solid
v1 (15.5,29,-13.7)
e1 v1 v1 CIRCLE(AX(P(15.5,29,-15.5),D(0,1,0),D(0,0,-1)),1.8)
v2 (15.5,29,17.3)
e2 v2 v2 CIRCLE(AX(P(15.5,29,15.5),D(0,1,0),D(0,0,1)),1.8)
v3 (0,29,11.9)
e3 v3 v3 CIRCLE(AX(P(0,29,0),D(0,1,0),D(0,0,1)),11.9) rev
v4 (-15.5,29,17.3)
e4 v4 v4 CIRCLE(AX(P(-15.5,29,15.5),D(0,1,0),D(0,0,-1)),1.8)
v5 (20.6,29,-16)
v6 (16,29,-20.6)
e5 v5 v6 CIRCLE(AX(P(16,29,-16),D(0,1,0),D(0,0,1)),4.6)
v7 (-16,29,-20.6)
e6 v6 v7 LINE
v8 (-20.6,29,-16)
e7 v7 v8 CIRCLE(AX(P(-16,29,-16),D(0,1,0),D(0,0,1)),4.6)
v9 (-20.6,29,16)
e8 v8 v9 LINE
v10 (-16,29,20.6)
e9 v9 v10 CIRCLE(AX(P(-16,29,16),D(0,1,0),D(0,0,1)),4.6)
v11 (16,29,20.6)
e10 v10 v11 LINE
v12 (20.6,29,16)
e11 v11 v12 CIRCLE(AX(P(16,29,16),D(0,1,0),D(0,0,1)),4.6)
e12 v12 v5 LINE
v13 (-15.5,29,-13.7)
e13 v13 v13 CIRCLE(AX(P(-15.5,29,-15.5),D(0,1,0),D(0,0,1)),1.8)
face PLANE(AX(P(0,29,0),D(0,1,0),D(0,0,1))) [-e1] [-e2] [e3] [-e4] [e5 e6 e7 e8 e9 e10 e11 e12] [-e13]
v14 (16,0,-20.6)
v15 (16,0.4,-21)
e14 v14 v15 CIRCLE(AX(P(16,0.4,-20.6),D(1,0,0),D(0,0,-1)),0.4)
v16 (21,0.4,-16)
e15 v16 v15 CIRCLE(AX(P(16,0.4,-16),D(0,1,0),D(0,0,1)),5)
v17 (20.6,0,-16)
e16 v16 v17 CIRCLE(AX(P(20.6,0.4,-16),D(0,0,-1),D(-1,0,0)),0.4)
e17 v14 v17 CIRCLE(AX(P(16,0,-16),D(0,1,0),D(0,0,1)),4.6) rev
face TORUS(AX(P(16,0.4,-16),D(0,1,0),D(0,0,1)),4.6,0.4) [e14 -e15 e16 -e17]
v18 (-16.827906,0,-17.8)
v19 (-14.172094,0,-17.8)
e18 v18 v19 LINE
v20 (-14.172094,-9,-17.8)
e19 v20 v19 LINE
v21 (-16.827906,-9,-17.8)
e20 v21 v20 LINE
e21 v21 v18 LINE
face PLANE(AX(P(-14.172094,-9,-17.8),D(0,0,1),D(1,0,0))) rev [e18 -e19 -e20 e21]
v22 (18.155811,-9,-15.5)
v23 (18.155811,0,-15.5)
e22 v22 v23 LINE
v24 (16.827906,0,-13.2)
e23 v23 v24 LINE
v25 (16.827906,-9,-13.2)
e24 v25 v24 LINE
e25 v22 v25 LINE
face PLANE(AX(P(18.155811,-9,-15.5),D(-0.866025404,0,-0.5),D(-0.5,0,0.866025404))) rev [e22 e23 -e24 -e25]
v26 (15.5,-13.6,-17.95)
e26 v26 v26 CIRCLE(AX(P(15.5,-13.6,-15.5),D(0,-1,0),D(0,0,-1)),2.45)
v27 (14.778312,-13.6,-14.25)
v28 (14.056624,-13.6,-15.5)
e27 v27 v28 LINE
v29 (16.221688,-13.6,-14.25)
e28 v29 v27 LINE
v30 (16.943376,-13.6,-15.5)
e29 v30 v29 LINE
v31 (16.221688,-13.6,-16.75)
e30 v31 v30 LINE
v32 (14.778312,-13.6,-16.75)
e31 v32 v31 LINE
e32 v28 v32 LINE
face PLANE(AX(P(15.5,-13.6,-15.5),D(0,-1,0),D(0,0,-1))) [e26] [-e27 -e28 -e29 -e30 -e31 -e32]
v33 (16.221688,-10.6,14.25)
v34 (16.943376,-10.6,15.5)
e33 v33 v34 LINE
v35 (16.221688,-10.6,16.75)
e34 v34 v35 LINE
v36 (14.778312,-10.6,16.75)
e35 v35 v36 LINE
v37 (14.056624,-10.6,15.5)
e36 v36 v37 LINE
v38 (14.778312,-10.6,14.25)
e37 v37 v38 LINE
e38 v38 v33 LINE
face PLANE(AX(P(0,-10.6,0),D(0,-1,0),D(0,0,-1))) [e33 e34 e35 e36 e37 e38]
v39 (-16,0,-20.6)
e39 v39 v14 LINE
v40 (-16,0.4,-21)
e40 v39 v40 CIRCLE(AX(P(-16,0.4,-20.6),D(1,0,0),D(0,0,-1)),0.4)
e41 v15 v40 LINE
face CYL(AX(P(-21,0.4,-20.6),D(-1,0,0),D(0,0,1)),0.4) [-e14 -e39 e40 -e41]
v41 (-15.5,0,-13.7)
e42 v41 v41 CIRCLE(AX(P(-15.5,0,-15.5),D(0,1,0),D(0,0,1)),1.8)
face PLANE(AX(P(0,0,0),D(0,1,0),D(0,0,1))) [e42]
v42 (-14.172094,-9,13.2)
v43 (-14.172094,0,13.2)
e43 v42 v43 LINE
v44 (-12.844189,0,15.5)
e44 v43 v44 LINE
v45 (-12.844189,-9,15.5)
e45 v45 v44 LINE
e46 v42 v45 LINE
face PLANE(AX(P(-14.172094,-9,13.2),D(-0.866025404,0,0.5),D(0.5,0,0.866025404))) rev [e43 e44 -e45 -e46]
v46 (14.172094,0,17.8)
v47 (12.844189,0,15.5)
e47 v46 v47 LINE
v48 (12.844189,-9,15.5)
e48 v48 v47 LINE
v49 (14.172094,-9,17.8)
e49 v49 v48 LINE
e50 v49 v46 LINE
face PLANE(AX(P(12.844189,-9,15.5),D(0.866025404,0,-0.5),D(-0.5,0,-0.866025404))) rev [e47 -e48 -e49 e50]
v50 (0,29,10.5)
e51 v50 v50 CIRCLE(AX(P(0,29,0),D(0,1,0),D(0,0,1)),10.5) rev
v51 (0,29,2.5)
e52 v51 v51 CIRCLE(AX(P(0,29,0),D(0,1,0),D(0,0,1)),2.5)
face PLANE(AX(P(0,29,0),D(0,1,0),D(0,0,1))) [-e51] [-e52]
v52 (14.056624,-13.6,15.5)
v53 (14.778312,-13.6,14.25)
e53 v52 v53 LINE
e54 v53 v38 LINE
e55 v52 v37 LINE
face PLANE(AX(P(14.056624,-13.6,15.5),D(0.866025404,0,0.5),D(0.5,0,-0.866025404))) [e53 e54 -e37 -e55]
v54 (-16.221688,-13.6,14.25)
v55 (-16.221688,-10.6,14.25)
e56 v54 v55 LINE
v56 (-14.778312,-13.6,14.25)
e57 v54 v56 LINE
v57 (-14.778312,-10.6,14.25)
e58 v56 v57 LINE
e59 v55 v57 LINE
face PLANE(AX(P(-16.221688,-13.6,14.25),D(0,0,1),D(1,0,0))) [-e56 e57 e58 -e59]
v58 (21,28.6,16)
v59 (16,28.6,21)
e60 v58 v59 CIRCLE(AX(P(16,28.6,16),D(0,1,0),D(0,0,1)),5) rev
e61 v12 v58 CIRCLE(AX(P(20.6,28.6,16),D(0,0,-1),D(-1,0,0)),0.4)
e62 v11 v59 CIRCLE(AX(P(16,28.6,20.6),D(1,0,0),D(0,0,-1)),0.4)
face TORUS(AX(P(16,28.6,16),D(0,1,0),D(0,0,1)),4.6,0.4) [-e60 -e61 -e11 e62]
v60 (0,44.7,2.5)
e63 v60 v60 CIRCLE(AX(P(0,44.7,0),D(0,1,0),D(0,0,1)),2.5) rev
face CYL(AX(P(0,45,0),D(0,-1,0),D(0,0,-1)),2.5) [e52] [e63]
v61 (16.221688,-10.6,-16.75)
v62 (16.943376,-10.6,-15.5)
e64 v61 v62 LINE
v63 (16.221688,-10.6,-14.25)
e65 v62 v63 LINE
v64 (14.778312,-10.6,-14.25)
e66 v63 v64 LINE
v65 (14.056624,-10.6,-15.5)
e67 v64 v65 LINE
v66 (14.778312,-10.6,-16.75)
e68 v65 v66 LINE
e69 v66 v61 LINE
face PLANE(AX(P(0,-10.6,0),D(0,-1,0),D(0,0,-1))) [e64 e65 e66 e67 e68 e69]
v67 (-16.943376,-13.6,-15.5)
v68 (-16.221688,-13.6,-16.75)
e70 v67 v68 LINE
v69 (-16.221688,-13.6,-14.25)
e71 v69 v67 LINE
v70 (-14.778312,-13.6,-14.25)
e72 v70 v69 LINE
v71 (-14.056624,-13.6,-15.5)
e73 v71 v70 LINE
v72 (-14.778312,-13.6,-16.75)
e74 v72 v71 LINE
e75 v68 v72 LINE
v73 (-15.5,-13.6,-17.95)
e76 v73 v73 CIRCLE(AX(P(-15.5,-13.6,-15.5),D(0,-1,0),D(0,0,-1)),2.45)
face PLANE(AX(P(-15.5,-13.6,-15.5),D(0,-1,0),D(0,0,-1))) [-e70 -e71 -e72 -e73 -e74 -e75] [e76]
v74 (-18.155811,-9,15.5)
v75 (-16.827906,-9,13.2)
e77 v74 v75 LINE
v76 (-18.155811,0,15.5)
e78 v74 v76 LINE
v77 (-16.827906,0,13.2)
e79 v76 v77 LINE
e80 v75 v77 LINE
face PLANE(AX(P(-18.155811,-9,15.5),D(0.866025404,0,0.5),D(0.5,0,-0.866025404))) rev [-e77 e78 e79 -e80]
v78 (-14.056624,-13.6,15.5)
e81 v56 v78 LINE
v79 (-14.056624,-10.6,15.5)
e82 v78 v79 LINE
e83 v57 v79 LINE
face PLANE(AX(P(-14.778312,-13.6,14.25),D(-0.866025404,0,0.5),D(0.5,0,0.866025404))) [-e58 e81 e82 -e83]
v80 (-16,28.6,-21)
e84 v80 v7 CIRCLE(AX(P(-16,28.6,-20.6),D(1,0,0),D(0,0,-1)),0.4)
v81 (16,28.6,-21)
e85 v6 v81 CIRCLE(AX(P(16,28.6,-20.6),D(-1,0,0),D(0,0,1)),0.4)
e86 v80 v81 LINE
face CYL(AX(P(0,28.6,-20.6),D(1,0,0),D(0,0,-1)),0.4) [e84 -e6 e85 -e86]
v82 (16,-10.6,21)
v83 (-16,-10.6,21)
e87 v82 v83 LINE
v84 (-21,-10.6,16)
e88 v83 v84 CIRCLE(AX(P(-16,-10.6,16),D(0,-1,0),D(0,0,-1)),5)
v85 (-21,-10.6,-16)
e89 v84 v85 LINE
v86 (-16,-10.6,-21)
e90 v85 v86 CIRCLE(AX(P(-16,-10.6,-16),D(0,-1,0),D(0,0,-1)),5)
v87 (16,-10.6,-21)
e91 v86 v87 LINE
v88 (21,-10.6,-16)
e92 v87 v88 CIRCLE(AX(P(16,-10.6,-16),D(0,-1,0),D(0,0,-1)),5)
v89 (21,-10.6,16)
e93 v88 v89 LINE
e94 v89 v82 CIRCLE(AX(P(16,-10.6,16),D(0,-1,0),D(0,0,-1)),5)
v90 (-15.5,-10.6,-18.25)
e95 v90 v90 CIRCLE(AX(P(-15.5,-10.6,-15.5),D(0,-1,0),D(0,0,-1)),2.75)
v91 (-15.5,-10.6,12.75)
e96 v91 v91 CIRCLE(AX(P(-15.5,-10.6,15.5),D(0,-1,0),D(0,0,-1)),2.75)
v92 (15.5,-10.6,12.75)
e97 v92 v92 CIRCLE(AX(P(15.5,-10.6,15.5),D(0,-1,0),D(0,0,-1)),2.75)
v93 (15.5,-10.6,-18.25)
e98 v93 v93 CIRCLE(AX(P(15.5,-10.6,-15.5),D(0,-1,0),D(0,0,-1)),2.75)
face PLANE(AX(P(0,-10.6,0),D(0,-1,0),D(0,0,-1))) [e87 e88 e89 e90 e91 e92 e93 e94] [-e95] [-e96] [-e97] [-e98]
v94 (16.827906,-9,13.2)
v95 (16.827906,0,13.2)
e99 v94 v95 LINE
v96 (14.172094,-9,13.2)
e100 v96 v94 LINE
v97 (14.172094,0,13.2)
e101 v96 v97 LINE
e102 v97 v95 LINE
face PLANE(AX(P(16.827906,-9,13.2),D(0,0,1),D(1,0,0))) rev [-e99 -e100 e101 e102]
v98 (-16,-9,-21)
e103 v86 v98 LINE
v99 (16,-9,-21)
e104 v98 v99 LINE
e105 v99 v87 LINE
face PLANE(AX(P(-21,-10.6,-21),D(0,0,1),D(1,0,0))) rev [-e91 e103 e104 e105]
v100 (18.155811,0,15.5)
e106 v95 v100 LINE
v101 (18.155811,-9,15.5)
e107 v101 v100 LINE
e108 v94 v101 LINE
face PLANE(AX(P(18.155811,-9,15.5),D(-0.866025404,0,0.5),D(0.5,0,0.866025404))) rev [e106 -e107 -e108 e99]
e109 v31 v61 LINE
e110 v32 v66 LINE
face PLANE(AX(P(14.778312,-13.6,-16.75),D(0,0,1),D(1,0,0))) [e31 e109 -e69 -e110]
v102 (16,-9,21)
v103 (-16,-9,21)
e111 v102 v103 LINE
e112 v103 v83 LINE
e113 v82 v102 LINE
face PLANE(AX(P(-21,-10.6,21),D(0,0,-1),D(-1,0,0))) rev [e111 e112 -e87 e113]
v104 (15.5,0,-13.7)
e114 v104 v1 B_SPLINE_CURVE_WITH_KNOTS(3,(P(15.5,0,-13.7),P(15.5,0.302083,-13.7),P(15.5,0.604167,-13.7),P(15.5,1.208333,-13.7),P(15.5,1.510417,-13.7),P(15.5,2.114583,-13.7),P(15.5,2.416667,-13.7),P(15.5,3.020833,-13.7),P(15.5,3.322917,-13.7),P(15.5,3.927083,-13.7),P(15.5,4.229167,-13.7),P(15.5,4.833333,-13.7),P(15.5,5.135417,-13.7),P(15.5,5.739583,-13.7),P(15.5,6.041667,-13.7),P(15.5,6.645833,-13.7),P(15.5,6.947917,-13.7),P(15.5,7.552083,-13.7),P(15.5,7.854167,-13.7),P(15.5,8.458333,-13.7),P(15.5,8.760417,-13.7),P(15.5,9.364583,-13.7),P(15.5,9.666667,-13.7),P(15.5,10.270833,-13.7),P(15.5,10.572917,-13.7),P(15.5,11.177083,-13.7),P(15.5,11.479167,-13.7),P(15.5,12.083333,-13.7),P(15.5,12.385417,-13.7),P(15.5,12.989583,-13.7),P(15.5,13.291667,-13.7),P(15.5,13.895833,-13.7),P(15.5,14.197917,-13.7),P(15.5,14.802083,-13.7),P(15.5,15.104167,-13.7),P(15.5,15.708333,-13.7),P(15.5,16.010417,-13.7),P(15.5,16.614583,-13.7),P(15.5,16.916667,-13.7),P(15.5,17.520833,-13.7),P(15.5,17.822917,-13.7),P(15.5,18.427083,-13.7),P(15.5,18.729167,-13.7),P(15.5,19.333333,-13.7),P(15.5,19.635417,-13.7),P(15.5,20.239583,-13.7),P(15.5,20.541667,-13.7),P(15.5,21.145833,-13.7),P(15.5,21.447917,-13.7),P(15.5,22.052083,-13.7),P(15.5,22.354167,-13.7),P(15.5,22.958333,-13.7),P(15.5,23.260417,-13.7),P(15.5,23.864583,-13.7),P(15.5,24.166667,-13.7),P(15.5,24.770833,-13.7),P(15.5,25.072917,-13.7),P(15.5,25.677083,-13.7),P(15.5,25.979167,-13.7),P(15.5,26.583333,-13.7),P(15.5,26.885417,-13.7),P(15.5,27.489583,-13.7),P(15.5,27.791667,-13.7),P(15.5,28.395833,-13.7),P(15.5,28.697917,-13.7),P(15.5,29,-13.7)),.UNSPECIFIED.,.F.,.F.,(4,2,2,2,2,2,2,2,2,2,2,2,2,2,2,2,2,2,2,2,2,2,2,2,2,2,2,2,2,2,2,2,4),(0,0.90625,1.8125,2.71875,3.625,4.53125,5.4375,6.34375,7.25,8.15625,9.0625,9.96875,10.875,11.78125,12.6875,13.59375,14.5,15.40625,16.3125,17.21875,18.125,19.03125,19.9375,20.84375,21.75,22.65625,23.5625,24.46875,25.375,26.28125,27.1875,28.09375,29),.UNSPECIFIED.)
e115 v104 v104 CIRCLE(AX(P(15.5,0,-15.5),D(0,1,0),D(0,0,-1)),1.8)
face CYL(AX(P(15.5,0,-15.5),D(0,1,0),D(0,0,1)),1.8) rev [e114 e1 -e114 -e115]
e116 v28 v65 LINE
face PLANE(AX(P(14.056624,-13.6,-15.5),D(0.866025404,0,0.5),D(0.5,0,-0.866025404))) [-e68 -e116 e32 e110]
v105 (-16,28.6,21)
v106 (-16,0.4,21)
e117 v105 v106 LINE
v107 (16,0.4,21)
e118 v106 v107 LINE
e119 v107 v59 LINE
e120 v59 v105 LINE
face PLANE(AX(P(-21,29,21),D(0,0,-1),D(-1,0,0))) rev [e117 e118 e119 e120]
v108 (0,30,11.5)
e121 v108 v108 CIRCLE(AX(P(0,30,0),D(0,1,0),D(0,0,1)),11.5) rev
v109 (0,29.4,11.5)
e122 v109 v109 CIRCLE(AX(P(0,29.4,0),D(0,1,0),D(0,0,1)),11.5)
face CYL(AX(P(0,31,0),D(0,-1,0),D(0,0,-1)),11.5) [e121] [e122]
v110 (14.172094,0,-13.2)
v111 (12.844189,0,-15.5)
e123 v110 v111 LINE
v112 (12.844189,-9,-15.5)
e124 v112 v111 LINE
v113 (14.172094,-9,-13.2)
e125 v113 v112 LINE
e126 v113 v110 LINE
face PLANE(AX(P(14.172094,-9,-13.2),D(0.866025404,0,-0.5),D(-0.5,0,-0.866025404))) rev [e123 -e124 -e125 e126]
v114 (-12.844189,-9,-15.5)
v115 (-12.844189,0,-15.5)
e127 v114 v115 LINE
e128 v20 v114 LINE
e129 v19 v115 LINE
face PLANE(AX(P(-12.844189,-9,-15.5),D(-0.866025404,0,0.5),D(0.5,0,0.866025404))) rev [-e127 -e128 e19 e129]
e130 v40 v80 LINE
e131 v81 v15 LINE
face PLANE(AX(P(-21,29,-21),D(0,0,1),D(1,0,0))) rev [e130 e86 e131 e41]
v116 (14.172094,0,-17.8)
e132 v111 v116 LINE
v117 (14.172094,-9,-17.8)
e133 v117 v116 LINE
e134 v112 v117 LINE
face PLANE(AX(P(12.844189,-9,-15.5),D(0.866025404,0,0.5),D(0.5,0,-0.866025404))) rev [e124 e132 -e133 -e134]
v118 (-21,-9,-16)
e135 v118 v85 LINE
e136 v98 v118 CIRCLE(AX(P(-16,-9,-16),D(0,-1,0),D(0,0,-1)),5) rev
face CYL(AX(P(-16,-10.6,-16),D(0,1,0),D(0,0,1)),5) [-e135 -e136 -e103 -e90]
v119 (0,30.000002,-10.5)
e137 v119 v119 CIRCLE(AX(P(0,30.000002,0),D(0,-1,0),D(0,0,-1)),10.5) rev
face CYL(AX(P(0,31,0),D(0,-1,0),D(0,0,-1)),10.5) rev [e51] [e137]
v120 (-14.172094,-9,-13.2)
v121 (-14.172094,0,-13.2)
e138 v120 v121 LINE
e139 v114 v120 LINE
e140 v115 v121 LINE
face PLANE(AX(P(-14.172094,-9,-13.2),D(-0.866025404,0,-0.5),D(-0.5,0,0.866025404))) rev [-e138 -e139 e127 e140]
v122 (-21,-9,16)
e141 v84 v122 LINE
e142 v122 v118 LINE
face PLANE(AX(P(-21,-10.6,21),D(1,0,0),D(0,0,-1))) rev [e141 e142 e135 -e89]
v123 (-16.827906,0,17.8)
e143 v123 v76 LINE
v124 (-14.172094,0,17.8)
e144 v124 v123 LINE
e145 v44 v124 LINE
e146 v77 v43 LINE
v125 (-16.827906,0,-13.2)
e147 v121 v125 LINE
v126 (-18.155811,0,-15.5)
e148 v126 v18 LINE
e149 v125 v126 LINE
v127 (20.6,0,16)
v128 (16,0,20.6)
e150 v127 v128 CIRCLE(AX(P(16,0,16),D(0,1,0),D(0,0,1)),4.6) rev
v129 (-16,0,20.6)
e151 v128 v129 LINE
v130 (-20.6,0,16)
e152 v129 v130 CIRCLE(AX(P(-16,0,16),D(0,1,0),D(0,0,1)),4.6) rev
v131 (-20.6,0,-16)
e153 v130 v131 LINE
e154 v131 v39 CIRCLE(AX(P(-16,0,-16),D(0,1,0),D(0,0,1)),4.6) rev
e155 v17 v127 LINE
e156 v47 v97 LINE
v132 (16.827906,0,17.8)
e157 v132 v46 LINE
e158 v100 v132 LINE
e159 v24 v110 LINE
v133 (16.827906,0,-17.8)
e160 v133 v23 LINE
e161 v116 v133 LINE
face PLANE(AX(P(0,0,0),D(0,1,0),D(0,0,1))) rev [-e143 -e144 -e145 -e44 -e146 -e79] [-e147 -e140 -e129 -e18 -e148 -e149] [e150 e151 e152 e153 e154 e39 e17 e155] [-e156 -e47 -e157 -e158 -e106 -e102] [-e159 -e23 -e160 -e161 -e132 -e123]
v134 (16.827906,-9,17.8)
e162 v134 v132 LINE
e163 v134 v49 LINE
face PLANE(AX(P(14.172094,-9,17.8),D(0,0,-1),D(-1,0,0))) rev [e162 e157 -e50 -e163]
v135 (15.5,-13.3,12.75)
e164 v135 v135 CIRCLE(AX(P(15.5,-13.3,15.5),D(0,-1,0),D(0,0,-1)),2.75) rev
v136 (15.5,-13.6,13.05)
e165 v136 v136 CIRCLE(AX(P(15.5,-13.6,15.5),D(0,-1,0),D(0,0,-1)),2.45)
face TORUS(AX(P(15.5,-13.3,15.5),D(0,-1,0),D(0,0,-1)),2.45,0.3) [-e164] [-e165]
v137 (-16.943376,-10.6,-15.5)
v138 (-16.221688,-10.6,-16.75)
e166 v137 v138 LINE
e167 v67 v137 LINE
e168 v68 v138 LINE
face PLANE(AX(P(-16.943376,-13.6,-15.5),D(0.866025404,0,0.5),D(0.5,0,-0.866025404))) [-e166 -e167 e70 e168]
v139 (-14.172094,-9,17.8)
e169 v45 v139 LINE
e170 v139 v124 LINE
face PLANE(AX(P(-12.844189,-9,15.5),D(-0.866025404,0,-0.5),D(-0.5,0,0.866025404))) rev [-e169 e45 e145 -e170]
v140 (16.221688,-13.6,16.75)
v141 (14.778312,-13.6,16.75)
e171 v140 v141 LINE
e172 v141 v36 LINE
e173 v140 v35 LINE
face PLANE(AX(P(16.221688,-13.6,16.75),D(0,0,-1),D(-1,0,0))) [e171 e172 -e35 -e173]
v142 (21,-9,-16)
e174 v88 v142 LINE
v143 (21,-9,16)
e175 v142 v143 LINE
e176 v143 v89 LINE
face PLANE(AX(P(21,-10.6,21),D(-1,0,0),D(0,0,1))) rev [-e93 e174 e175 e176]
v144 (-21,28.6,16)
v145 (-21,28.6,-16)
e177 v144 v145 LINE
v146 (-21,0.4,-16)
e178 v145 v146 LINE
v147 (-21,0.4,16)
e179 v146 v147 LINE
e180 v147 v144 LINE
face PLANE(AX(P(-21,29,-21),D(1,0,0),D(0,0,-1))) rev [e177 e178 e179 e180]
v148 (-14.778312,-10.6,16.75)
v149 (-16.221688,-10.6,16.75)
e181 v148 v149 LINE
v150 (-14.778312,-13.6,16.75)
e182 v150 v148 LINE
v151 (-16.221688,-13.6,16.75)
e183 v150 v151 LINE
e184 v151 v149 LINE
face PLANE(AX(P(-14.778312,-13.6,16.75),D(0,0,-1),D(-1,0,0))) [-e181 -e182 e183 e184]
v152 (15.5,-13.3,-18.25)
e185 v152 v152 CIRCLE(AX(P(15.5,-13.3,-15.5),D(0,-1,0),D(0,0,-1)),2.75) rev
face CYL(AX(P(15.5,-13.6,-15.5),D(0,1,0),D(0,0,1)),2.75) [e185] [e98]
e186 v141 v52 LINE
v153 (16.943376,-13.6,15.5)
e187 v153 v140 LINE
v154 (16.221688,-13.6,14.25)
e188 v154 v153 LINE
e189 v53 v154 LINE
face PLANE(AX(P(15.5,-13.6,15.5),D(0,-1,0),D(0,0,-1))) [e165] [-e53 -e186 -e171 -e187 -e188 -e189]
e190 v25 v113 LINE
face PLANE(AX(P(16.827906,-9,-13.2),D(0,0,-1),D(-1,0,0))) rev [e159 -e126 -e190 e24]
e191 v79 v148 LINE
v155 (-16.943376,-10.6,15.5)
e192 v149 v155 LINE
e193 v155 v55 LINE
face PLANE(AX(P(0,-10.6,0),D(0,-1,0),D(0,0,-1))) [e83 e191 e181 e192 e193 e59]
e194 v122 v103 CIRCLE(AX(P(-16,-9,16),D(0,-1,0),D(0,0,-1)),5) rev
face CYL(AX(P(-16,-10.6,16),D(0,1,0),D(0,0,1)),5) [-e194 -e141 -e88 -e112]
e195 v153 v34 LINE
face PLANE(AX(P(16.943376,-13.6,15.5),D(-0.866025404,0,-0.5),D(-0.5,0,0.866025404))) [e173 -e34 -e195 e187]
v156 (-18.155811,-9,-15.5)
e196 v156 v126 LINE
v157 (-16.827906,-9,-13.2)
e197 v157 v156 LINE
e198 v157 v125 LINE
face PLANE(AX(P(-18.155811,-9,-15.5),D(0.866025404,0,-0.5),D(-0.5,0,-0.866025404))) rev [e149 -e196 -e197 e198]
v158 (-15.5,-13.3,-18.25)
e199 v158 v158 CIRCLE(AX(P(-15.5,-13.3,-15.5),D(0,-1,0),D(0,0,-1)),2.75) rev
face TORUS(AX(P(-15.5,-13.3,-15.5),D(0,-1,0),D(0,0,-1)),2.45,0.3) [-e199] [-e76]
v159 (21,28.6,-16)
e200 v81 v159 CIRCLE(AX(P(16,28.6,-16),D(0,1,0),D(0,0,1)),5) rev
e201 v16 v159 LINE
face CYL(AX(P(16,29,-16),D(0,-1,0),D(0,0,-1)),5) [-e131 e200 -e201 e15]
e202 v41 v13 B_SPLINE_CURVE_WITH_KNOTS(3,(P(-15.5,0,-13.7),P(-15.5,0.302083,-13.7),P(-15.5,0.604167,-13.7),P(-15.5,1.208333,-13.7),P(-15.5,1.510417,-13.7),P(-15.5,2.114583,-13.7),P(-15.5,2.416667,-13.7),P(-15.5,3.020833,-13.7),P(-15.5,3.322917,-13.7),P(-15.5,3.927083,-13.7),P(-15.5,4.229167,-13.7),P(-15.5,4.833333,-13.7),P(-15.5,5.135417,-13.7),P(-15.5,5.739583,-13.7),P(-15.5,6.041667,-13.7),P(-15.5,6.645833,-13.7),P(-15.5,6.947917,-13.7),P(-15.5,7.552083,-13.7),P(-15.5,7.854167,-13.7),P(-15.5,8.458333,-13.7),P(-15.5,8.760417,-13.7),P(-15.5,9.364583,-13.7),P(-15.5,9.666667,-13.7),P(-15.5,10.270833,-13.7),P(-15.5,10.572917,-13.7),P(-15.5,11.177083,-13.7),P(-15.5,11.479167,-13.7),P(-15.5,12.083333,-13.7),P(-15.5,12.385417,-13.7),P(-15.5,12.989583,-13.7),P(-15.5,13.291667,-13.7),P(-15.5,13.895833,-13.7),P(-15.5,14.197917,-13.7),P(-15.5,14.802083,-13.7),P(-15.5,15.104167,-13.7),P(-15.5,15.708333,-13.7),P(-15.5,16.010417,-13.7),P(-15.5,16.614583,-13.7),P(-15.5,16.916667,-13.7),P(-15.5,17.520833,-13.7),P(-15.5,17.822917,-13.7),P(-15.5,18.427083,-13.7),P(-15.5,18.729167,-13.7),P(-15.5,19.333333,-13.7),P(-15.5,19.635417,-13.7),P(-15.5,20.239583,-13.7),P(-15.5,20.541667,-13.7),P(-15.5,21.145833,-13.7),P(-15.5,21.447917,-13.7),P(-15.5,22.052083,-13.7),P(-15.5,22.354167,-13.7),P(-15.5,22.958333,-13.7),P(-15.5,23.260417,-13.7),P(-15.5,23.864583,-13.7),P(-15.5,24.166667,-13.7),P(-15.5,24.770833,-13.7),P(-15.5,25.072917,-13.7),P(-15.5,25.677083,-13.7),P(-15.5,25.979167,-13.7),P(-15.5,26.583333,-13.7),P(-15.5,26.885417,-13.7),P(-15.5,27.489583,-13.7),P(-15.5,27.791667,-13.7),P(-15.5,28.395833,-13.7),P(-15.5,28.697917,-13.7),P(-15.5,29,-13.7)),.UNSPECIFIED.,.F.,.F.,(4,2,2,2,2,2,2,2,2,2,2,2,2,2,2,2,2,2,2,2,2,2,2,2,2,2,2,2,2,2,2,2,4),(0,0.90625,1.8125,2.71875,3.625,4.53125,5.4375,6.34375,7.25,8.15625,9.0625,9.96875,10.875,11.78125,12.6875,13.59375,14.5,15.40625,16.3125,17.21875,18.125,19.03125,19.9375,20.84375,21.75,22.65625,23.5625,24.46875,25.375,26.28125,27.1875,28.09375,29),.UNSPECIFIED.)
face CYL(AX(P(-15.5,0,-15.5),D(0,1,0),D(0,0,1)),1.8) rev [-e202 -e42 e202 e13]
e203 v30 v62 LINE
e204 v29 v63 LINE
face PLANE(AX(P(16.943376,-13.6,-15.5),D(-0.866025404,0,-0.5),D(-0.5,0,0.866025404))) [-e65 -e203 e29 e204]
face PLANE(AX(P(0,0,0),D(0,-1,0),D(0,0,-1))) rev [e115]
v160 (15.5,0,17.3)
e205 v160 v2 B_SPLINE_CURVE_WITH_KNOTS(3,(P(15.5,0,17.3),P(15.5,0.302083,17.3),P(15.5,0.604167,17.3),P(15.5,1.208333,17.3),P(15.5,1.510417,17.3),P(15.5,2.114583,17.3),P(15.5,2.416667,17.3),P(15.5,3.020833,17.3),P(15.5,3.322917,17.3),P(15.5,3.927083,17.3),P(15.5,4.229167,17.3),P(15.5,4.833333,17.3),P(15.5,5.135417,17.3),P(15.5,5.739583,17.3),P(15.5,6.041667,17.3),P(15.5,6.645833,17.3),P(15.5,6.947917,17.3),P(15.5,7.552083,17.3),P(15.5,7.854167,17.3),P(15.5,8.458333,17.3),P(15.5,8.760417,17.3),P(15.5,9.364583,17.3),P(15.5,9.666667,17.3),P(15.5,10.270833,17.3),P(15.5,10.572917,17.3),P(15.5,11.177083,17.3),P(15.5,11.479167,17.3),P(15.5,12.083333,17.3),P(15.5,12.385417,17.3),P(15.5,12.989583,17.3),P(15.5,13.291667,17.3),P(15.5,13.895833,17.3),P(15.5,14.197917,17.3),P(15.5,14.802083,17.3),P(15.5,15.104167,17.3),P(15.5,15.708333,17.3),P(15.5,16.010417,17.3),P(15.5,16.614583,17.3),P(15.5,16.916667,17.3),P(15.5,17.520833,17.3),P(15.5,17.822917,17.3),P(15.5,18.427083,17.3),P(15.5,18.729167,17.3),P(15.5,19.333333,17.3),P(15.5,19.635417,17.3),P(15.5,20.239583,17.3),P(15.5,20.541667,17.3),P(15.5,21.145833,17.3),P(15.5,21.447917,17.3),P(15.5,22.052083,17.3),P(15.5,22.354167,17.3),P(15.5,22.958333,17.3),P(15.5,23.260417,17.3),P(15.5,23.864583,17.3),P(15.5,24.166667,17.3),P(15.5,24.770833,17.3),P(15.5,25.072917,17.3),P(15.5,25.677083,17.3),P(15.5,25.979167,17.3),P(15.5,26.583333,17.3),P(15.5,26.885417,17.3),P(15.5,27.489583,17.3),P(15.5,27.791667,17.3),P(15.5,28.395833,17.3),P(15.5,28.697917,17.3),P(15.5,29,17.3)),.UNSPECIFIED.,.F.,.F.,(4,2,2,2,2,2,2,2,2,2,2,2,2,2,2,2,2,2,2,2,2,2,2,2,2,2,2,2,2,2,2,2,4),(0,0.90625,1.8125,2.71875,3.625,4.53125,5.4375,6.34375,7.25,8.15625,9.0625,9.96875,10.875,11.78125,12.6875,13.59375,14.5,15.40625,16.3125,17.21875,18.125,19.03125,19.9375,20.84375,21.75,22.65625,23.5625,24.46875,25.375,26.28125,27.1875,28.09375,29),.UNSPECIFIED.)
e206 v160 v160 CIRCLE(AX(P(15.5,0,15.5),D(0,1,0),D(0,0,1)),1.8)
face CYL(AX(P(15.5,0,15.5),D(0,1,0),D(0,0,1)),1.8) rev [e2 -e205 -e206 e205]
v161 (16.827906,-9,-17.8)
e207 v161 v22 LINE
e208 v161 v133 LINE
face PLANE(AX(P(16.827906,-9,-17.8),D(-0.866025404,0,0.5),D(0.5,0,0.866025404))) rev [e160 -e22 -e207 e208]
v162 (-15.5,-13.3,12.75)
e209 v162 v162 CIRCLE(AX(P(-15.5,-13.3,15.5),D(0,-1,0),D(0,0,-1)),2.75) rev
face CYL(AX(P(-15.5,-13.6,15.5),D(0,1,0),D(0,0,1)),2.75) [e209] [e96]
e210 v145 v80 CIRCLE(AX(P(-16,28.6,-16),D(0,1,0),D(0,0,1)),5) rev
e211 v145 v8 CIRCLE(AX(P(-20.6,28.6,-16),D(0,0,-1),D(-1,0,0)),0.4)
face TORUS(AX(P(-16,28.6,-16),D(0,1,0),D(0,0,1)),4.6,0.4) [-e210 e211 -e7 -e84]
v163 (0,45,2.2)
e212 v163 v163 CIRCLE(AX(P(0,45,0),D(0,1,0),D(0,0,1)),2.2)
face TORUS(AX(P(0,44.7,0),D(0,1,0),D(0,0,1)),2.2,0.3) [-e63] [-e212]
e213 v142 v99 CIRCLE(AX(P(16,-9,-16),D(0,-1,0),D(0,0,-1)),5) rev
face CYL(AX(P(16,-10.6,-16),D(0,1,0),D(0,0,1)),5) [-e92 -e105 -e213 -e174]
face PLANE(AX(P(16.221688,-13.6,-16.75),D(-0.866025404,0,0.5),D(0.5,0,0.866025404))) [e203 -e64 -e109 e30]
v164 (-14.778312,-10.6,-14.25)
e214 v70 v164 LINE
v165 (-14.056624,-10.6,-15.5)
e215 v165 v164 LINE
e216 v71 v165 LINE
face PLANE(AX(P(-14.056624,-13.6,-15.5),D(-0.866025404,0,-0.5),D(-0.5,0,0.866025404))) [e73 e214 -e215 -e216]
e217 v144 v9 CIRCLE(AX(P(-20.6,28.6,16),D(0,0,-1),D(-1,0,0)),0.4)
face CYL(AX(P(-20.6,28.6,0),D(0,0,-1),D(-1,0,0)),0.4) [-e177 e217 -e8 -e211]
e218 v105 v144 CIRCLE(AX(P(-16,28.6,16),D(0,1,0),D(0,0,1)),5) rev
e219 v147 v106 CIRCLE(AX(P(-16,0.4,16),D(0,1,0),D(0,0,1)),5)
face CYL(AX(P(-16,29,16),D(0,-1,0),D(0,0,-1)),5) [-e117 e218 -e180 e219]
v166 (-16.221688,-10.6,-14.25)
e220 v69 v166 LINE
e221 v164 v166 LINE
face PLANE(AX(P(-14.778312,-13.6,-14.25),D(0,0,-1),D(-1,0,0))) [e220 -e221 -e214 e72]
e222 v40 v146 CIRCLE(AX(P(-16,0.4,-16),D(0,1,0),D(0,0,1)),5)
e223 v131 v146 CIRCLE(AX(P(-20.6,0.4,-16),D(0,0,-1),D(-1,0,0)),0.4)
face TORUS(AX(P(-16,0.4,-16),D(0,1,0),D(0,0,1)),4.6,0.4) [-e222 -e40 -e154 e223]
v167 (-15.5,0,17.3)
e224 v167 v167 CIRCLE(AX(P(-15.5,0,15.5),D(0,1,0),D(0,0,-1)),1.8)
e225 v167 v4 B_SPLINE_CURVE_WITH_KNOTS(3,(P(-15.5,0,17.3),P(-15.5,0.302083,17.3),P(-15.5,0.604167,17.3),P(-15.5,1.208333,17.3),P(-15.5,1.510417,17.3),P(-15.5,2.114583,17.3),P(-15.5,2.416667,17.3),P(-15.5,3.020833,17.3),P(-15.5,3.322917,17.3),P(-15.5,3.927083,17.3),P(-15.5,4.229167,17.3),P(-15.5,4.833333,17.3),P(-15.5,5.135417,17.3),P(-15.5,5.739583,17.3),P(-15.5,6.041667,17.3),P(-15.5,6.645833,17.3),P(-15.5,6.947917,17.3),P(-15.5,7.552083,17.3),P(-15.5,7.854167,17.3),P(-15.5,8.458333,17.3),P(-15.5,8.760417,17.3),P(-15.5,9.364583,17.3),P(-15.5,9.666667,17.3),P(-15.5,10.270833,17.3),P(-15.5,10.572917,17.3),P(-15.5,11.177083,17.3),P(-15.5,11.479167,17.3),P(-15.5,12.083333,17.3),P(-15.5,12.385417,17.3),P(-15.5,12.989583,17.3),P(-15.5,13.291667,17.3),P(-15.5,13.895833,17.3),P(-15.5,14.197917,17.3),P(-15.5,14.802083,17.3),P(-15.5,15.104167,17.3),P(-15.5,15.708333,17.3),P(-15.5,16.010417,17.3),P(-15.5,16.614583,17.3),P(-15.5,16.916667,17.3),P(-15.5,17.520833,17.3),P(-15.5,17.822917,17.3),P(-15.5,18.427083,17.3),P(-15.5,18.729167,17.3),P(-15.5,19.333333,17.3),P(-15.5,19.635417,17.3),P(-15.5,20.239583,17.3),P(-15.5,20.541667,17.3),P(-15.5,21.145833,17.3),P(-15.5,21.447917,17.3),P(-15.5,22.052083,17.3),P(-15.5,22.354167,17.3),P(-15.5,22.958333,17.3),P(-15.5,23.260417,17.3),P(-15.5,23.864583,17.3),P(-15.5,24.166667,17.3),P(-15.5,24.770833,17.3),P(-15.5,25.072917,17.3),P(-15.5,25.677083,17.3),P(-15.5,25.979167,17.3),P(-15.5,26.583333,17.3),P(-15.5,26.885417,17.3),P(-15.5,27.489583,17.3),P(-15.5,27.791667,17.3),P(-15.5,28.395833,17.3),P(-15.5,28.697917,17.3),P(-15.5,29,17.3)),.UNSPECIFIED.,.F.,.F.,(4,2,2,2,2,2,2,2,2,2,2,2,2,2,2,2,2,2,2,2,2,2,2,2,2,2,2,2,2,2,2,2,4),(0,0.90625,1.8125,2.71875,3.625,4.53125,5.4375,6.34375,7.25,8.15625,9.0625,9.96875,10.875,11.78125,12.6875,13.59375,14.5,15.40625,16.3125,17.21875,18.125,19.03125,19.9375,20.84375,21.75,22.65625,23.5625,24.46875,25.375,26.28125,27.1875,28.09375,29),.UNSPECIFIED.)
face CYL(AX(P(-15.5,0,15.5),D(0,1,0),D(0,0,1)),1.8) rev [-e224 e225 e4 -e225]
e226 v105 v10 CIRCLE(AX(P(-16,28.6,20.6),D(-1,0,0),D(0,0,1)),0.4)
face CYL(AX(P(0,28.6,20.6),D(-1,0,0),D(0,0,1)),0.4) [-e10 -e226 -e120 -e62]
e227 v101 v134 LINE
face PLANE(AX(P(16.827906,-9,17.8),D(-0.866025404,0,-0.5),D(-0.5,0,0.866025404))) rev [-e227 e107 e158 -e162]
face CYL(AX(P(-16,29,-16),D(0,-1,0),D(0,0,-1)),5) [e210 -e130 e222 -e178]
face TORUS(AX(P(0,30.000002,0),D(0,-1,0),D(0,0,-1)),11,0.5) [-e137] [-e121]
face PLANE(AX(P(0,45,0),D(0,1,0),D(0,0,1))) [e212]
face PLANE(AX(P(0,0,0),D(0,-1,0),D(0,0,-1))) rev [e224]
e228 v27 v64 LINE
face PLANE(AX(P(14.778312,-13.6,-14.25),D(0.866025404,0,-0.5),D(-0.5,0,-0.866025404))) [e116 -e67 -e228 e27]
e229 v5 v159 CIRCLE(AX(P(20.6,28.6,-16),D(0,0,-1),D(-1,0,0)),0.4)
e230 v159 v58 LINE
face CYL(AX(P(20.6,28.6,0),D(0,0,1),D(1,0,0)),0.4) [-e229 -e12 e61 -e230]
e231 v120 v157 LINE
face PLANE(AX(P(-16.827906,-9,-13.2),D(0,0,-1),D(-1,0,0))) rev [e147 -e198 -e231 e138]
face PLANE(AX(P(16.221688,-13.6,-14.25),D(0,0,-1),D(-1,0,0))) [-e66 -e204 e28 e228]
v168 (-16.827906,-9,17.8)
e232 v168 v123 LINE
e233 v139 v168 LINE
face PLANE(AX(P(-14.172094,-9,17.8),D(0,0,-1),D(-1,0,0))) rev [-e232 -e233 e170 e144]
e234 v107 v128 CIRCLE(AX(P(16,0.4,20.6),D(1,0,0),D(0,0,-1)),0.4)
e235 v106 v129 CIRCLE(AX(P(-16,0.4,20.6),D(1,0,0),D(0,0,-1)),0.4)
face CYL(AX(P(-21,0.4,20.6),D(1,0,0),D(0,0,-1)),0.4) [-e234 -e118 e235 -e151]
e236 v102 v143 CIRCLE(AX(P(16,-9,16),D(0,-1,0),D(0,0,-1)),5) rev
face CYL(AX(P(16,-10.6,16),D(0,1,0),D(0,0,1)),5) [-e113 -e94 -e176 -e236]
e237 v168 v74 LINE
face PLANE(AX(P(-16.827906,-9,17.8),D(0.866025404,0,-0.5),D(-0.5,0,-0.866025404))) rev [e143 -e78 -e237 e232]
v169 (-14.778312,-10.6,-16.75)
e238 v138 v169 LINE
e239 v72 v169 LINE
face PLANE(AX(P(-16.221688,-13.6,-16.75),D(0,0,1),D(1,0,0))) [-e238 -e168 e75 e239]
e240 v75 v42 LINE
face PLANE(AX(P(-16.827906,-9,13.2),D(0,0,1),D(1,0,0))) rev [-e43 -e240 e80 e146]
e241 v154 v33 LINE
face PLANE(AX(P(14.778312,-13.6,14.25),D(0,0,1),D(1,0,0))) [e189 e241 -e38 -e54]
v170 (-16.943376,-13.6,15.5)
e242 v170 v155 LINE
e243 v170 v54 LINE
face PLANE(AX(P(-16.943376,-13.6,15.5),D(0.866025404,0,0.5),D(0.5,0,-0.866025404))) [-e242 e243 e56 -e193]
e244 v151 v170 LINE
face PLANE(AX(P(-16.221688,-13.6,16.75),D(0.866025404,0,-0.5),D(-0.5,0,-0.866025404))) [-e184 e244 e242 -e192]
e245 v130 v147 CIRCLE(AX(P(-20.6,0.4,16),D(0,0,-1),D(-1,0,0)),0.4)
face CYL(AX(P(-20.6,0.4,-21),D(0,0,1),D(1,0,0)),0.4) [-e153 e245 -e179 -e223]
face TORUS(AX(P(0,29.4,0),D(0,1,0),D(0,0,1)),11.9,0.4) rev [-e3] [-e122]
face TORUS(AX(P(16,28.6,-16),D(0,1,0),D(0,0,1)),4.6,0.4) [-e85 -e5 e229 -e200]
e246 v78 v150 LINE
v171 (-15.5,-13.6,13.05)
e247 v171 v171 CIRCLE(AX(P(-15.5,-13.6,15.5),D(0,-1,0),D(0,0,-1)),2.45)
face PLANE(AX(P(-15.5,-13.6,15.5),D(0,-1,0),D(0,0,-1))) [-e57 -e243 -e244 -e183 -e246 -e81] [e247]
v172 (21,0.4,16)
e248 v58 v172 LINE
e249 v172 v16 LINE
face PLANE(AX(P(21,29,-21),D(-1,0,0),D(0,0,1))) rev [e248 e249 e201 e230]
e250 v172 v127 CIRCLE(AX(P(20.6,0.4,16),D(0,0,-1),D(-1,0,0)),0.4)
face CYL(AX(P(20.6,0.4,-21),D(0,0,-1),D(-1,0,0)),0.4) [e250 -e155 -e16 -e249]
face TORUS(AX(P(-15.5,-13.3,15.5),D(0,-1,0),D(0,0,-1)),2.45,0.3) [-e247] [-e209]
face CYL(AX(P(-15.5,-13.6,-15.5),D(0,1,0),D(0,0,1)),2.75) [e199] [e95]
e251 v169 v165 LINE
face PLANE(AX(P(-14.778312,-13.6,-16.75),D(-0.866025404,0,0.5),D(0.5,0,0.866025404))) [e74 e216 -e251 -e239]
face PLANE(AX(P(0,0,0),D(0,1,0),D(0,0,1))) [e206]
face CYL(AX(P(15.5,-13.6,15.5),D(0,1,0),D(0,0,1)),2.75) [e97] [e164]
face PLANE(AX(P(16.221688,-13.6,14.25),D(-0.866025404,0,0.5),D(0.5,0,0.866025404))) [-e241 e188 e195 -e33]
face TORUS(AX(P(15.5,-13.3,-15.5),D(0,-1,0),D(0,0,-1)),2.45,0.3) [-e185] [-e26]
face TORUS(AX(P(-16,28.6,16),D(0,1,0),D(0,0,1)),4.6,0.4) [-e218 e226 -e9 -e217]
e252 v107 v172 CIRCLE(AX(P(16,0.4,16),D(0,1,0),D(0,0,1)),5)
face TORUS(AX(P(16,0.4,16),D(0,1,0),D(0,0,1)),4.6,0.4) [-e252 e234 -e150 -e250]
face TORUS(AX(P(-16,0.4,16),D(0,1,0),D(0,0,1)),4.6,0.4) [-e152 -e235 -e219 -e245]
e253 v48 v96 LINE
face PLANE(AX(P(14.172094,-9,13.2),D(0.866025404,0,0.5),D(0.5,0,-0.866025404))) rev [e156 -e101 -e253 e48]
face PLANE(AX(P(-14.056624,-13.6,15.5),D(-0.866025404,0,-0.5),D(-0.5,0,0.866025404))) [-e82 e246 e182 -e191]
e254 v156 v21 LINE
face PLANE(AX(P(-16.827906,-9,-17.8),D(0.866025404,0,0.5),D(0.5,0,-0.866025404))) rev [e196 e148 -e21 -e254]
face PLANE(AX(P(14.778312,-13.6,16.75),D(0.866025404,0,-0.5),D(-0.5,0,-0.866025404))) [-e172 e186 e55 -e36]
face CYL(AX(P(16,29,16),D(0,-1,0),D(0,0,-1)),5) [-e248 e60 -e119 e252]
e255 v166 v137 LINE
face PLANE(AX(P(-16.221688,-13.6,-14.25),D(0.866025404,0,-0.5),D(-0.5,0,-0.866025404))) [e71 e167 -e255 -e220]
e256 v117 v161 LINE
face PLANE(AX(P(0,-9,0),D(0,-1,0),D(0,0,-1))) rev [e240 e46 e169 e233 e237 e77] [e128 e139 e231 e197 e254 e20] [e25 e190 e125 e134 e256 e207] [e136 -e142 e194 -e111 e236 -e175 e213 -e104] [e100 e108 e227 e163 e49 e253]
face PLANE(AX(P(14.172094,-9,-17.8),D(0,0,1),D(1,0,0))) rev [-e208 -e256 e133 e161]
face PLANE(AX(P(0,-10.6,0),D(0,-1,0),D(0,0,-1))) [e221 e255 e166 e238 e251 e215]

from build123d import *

# Parameters (mm, degrees)
SKETCH_1_W          = 42
SKETCH_1_H          = 42
EXTRUDE_1_DEPTH     = 29
SKETCH_2_R          = 11.5
SKETCH_2_R_2        = 10.5
EXTRUDE_2_DEPTH     = 2
SKETCH_2_3_R        = 2.5
EXTRUDE_3_DEPTH     = 16
SKETCH_4_R          = 1.8
CUT_EXTRUDE_1_DEPTH = 42.509035161
EXTRUDE_4_DEPTH     = 9
SKETCH_6_W          = 42
SKETCH_6_H          = 42
EXTRUDE_5_DEPTH     = 1.6
SKETCH_7_R          = 2.75
EXTRUDE_6_DEPTH     = 3
FILLET_1_R          = 5
FILLET_2_R          = 1
FILLET_3_R          = 0.5
FILLET_4_R          = 0.4
FILLET_5_R          = 0.4
FILLET_6_R          = 0.3
FILLET_7_R          = 0.3


# Some blends are built 0.0001 mm under size
with BuildPart() as part:
    # 草图1 → 凸台-拉伸1 (new body)
    with BuildSketch(Plane(origin=(0, 0, 0), x_dir=(1, 0, 0), z_dir=(0, 1, 0))):
        Rectangle(SKETCH_1_W, SKETCH_1_H)
    extrude(amount=EXTRUDE_1_DEPTH)

    # 草图2 → 凸台-拉伸2 (add)
    with BuildSketch(Plane(origin=(0, 29, 0), x_dir=(1, 0, 0), z_dir=(0, 1, 0))):
        with Locations(Location((0, 0, 0), (0, 0, 270))):
            Circle(SKETCH_2_R)
        with Locations(Location((0, 0, 0), (0, 0, 270))):
            Circle(SKETCH_2_R_2, mode=Mode.SUBTRACT)
    extrude(amount=EXTRUDE_2_DEPTH)

    # 草图2<3> → 凸台-拉伸3 (add)
    with BuildSketch(Plane(origin=(0, 29, 0), x_dir=(1, 0, 0), z_dir=(0, 1, 0))):
        with Locations(Location((0, 0, 0), (0, 0, 270))):
            Circle(SKETCH_2_3_R)
    extrude(amount=EXTRUDE_3_DEPTH)

    # 草图4 → 切除-拉伸1 (cut, through all)
    with BuildSketch(Plane(origin=(0, 29, 0), x_dir=(1, 0, 0), z_dir=(0, 1, 0))):
        with Locations(Location((-15.5, 15.5, 0), (0, 0, 270))):
            Circle(SKETCH_4_R)
        with Locations(Location((15.5, 15.5, 0), (0, 0, 270))):
            Circle(SKETCH_4_R)
        with Locations(Location((15.5, -15.5, 0), (0, 0, 270))):
            Circle(SKETCH_4_R)
        with Locations(Location((-15.5, -15.5, 0), (0, 0, 270))):
            Circle(SKETCH_4_R)
    extrude(amount=-CUT_EXTRUDE_1_DEPTH, mode=Mode.SUBTRACT)

    # 草图5 → 凸台-拉伸4 (add)
    with BuildSketch(Plane.XZ):
        Polygon((-14.172094381, 13.2), (-12.844188762, 15.5), (-14.172094381, 17.8), (-16.827905619, 17.8), (-18.155811238, 15.5), (-16.827905619, 13.2), align=None)
        Polygon((-16.827905619, -13.2), (-14.172094381, -13.2), (-12.844188762, -15.5), (-14.172094381, -17.8), (-16.827905619, -17.8), (-18.155811238, -15.5), align=None)
        Polygon((18.155811238, -15.5), (16.827905619, -13.2), (14.172094381, -13.2), (12.844188762, -15.5), (14.172094381, -17.8), (16.827905619, -17.8), align=None)
        Polygon((16.827905619, 13.2), (14.172094381, 13.2), (12.844188762, 15.5), (14.172094381, 17.8), (16.827905619, 17.8), (18.155811238, 15.5), align=None)
    extrude(amount=EXTRUDE_4_DEPTH)

    # 草图6 → 凸台-拉伸5 (add)
    with BuildSketch(Plane.XZ.offset(9)):
        Rectangle(SKETCH_6_W, SKETCH_6_H)
    extrude(amount=EXTRUDE_5_DEPTH)

    # 草图7 → 凸台-拉伸6 (add)
    # profile 1 of 4: a face of its own
    with BuildSketch(Plane.XZ.offset(10.6)):
        with Locations(Location((-15.5, 15.5, 0), (0, 0, 270))):
            Circle(SKETCH_7_R)
        Polygon((-14.778312164, 14.25), (-14.056624327, 15.5), (-14.778312164, 16.75), (-16.221687836, 16.75), (-16.943375673, 15.5), (-16.221687836, 14.25), align=None, mode=Mode.SUBTRACT)
    # profile 2 of 4: a face of its own
    with BuildSketch(Plane.XZ.offset(10.6)):
        with Locations(Location((15.5, 15.5, 0), (0, 0, 270))):
            Circle(SKETCH_7_R)
        Polygon((16.221687836, 14.25), (16.943375673, 15.5), (16.221687836, 16.75), (14.778312164, 16.75), (14.056624327, 15.5), (14.778312164, 14.25), align=None, mode=Mode.SUBTRACT)
    # profile 3 of 4: a face of its own
    with BuildSketch(Plane.XZ.offset(10.6)):
        with Locations(Location((15.5, -15.5, 0), (0, 0, 270))):
            Circle(SKETCH_7_R)
        Polygon((16.221687836, -16.75), (16.943375673, -15.5), (16.221687836, -14.25), (14.778312164, -14.25), (14.056624327, -15.5), (14.778312164, -16.75), align=None, mode=Mode.SUBTRACT)
    # profile 4 of 4: a face of its own
    with BuildSketch(Plane.XZ.offset(10.6)):
        with Locations(Location((-15.5, -15.5, 0), (0, 0, 270))):
            Circle(SKETCH_7_R)
        Polygon((-14.778312164, -16.75), (-14.056624327, -15.5), (-14.778312164, -14.25), (-16.221687836, -14.25), (-16.943375673, -15.5), (-16.221687836, -16.75), align=None, mode=Mode.SUBTRACT)
    extrude(amount=EXTRUDE_6_DEPTH)

    # 圆角1
    fillet_1_edges = [part.edges().sort_by_distance(p)[0] for p in [
        (21, -9.8, -21),
        (21, -9.8, 21),
        (-21, -9.8, 21),
        (-21, -9.8, -21),
        (21, 14.5, 21),
        (-21, 14.5, 21),
        (-21, 14.5, -21),
        (21, 14.5, -21),
    ]]
    fillet(fillet_1_edges, radius=FILLET_1_R)

    # 圆角2
    fillet_2_edges = [part.edges().sort_by_distance(p)[0] for p in [
        (0, 31, -11.5),
    ]]
    fillet(fillet_2_edges, radius=FILLET_2_R - 0.0001)  # a hair under: the kernel refuses the full size

    # 圆角3
    # the kernel refuses this fillet: 0.5 mm, written as the material it takes off along each edge
    with BuildSketch(Plane(origin=(0, 31, 0), x_dir=(0, 0, 1), z_dir=(-1, 0, 0))) as fillet_3_piece_1:
        with BuildLine():
            CenterArc((11, -0.999898183), FILLET_3_R, 0.0002082, 179.9997918)
            Line((10.5, -0.999898183), (10.45, -0.999898183))
            Line((10.45, -0.999898183), (10.45, 0))
            Line((10.45, 0), (10.5, 0.05))
            ThreePointArc((10.5, 0.05), (10.5001, 0.05), (11.55, -0.999896185))
            Line((11.55, -0.999896185), (11.5, -0.999896367))
        make_face()
    revolve(axis=Axis((0, 31, 0), (0, 1, 0)), mode=Mode.SUBTRACT)

    # 圆角4
    fillet_4_edges = [part.edges().sort_by_distance(p)[0] for p in [
        (0, 29, -11.5),
    ]]
    fillet(fillet_4_edges, radius=FILLET_4_R)

    # 圆角5
    fillet_5_edges = [part.edges().sort_by_distance(p)[0] for p in [
        (-21, 0, 0),
        (-21, 29, 0),
        (21, 0, 0),
        (0, 0, 21),
        (0, 0, -21),
        (19.535533906, 0, -19.535533906),
        (19.535533906, 0, 19.535533906),
        (-19.535533906, 0, 19.535533906),
        (-19.535533906, 0, -19.535533906),
        (0, 29, -21),
        (21, 29, 0),
        (0, 29, 21),
        (19.535533906, 29, -19.535533906),
        (19.535533906, 29, 19.535533906),
        (-19.535533906, 29, 19.535533906),
        (-19.535533906, 29, -19.535533906),
    ]]
    fillet(fillet_5_edges, radius=FILLET_5_R)

    # 圆角6
    fillet_6_edges = [part.edges().sort_by_distance(p)[0] for p in [
        (-15.5, -13.6, 18.25),
        (15.5, -13.6, 18.25),
        (15.5, -13.6, -12.75),
        (-15.5, -13.6, -12.75),
    ]]
    fillet(fillet_6_edges, radius=FILLET_6_R)

    # 圆角7
    fillet_7_edges = [part.edges().sort_by_distance(p)[0] for p in [
        (0, 45, -2.5),
    ]]
    fillet(fillet_7_edges, radius=FILLET_7_R)


solid = part.part
